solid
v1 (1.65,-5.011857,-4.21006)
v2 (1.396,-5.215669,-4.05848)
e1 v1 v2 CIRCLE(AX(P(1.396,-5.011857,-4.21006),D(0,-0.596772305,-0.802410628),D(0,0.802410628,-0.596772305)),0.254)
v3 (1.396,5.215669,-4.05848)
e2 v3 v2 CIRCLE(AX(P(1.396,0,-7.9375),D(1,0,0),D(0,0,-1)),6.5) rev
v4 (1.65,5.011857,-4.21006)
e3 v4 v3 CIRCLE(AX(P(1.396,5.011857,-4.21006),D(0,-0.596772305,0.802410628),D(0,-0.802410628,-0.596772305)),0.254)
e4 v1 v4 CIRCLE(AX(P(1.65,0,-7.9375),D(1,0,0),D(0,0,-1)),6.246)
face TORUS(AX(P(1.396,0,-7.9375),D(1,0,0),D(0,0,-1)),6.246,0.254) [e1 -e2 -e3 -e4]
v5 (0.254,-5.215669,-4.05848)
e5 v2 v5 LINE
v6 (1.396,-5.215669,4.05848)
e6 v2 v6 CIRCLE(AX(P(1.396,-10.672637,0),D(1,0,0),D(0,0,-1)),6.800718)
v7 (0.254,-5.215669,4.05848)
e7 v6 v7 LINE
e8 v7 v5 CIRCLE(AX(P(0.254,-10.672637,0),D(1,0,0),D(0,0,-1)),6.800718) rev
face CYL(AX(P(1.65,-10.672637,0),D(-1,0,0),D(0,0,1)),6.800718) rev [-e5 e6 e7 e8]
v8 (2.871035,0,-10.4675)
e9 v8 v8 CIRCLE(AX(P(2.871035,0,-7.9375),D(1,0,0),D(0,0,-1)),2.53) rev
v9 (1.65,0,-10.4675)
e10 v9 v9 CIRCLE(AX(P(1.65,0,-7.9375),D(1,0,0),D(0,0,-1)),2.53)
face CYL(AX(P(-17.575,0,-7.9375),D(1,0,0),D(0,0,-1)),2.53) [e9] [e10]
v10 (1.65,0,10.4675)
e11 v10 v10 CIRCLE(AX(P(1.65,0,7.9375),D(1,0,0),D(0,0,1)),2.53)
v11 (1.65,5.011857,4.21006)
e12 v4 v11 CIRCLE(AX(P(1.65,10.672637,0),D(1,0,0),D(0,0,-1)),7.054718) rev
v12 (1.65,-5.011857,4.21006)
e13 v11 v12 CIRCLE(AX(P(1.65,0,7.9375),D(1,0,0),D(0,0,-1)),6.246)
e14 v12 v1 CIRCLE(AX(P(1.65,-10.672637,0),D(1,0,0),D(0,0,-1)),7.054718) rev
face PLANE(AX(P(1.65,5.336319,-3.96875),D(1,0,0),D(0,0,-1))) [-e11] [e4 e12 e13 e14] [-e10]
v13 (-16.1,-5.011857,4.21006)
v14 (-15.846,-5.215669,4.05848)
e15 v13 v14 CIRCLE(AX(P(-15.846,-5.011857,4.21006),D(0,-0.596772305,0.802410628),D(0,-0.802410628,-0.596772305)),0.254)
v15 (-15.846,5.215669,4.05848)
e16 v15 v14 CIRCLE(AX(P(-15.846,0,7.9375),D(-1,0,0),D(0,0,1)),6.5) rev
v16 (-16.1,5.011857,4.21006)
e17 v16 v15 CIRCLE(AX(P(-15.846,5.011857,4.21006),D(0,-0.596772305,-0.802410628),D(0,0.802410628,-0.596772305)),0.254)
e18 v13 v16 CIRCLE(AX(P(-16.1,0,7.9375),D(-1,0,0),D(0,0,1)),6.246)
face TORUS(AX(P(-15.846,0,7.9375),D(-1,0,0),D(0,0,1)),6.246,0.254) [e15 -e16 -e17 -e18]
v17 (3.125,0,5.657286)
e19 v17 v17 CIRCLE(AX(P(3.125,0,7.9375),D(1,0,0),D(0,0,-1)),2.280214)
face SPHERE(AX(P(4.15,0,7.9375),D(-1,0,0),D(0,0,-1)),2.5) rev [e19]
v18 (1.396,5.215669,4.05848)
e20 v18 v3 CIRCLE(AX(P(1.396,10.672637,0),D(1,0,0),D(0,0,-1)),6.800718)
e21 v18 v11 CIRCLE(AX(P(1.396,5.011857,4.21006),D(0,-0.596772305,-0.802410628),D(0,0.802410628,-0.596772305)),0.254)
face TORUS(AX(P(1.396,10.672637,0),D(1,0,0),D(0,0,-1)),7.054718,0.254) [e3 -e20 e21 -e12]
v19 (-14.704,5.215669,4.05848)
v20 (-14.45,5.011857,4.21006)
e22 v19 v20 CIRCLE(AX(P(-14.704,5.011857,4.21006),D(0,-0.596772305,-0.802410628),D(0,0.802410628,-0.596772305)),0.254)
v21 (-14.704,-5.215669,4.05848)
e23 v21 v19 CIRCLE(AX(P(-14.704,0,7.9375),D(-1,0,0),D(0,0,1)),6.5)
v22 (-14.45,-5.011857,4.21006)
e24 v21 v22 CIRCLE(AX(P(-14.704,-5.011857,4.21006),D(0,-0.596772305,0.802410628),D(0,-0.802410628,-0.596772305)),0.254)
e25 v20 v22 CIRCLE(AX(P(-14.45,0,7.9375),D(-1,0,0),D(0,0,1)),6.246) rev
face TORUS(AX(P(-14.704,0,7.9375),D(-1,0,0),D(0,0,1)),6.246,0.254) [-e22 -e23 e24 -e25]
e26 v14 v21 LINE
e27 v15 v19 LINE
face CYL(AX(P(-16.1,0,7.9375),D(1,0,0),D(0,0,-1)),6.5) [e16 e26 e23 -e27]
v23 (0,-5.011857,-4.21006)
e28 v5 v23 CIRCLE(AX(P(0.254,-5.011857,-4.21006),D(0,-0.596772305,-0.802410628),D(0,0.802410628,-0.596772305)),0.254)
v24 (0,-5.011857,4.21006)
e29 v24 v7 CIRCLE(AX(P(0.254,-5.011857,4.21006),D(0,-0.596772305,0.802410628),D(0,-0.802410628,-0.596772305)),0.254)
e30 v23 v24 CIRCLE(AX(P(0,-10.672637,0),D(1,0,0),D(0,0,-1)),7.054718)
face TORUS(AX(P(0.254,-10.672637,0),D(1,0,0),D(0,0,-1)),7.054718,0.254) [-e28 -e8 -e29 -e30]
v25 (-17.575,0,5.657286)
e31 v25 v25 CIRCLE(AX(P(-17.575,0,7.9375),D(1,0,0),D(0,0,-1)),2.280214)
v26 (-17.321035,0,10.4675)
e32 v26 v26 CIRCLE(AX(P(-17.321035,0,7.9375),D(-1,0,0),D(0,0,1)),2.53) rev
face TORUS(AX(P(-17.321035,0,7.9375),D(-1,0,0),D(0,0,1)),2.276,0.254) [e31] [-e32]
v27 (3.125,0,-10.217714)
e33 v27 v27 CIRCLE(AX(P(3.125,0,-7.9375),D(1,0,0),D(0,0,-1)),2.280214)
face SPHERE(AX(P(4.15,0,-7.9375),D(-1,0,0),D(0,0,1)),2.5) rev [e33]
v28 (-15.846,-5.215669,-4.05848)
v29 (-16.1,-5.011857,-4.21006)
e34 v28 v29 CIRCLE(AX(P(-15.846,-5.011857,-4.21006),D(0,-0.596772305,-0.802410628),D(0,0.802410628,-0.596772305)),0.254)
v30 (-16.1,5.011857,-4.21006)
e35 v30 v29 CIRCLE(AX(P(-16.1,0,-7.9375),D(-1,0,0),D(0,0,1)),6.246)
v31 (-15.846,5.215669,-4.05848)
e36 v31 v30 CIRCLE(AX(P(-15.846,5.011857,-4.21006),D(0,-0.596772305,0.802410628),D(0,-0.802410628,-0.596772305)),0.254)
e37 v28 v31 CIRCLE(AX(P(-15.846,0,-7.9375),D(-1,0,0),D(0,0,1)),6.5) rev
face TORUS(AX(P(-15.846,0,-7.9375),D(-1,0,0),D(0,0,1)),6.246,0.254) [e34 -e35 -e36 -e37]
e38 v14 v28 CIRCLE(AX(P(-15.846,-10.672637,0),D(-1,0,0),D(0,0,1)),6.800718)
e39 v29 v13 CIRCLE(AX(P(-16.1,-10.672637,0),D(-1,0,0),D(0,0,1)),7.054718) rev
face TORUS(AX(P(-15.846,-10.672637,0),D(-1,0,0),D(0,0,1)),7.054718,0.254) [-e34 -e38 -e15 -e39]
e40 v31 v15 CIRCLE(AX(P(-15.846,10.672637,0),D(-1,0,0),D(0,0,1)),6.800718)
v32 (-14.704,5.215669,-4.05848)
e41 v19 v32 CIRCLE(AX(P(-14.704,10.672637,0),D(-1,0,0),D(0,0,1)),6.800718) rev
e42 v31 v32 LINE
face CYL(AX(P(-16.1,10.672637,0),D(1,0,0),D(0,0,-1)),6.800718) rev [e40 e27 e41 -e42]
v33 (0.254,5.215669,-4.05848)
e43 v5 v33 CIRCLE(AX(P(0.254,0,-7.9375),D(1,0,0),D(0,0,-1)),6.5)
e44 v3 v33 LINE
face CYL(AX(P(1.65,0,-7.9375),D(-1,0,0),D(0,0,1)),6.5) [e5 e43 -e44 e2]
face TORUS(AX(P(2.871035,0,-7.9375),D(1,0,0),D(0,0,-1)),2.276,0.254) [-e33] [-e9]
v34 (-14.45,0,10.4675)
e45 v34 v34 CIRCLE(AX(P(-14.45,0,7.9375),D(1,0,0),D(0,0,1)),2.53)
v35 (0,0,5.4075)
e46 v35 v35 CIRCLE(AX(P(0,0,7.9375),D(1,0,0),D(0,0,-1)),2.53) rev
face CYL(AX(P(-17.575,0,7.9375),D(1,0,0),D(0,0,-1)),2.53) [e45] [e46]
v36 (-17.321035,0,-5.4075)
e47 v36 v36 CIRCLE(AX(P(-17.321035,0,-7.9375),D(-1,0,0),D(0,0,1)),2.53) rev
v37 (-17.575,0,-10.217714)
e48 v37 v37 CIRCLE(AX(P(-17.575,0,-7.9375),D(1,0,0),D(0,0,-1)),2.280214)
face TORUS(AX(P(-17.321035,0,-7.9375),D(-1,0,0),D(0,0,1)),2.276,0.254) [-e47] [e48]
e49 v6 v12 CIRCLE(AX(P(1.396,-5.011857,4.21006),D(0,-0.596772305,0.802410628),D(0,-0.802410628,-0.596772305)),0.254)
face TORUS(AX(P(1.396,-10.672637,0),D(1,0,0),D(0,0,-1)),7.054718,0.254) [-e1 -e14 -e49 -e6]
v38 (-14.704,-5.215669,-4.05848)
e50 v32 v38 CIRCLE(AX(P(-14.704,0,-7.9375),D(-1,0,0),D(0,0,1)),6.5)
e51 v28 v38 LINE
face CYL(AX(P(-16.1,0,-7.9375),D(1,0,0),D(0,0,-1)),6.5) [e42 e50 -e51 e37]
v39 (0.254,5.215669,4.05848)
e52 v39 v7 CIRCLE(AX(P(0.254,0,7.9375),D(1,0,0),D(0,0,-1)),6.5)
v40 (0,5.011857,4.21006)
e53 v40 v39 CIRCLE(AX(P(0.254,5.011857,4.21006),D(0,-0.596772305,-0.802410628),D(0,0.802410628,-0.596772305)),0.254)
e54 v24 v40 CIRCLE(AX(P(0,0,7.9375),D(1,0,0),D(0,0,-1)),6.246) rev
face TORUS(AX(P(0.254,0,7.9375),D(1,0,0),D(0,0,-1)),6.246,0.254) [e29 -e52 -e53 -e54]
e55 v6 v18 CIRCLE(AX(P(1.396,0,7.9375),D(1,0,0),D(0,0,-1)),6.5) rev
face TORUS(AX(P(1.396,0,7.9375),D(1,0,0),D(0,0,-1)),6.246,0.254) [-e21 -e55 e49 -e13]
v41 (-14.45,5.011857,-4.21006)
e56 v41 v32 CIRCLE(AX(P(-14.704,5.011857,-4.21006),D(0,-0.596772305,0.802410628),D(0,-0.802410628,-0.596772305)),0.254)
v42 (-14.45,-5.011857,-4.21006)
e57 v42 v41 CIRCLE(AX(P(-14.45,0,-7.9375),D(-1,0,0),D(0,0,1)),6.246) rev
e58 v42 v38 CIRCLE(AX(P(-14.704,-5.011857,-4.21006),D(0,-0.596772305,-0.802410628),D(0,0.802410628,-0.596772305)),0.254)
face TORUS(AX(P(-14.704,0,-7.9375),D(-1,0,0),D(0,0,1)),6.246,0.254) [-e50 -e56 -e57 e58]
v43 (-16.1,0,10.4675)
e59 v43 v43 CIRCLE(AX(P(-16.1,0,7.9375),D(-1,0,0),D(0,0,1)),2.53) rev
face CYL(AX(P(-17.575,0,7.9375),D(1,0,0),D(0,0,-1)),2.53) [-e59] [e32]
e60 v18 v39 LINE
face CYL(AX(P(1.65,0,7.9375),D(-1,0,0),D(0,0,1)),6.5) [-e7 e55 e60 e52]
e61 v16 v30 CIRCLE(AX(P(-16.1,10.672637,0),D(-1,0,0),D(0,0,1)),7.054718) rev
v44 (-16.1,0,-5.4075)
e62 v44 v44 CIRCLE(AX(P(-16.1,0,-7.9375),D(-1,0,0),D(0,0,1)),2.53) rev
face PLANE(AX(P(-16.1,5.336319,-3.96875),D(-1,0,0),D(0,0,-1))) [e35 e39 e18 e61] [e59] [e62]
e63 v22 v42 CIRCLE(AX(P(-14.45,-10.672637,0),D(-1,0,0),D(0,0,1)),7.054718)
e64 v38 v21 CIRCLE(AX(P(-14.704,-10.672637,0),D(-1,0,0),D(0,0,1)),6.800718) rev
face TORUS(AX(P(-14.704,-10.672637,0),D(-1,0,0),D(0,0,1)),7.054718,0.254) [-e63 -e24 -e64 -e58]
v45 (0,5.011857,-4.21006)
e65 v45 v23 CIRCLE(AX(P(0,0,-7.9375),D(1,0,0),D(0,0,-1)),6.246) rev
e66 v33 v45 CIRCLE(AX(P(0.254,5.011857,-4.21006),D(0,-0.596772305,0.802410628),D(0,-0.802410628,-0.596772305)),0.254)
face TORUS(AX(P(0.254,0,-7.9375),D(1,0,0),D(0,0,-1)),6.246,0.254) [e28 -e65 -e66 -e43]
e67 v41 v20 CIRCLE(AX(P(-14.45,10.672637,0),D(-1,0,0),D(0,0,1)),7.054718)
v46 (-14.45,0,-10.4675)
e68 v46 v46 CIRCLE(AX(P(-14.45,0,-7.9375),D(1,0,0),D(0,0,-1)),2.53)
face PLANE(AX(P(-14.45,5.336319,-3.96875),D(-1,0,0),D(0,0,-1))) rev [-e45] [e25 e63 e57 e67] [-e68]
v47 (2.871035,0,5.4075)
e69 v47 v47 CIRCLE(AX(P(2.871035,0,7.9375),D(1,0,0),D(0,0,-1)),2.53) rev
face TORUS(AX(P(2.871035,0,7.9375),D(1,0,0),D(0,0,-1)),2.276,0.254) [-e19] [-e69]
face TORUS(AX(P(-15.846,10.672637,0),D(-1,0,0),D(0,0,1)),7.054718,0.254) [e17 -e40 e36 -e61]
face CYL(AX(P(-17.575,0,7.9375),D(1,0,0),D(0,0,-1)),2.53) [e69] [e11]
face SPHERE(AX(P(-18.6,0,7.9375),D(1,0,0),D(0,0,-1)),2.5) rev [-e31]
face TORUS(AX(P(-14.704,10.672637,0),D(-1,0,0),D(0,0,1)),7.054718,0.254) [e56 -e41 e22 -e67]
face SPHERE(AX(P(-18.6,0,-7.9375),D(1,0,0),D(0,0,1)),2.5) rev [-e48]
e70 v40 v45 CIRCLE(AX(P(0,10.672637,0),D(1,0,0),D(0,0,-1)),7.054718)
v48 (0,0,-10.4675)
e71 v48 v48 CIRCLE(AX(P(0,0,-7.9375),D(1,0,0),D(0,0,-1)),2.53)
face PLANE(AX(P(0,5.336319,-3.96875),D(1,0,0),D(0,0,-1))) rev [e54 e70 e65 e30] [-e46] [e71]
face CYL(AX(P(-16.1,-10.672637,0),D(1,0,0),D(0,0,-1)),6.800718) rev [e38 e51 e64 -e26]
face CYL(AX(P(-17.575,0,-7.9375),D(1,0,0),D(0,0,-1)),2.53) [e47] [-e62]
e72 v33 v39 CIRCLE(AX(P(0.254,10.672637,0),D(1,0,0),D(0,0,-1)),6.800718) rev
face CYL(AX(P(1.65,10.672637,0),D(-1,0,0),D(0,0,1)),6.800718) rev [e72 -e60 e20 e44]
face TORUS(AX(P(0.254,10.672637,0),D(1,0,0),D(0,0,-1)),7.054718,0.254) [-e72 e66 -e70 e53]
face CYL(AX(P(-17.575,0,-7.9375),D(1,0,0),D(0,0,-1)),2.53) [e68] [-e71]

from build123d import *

# Parameters (mm, degrees)
SKETCH2_R           = 2.53
BOSS_EXTRUDE1_DEPTH = 1.65
BOSS_EXTRUDE2_START = -19.225
SKETCH3_R           = 2.53
BOSS_EXTRUDE2_DEPTH = 20.7
FILLET1_R           = 0.254
FILLET2_R           = 0.254


with BuildPart() as part:
    # Sketch2 → Boss-Extrude1 (new body)
    with BuildSketch(Plane(origin=(0, 0, 0), x_dir=(0, 0, -1), z_dir=(1, 0, 0))):
        with BuildLine():
            ThreePointArc((4.05848002, -5.215669084), (14.4375, 0), (4.05848002, 5.215669084))
            ThreePointArc((4.05848002, 5.215669084), (0, 3.871919532), (-4.05848002, 5.215669084))
            ThreePointArc((-4.05848002, 5.215669084), (-14.4375, 0), (-4.05848002, -5.215669084))
            ThreePointArc((-4.05848002, -5.215669084), (0, -3.871919532), (4.05848002, -5.215669084))
        make_face()
        with Locations((7.9375, 0)):
            Circle(SKETCH2_R, mode=Mode.SUBTRACT)
        with Locations(Location((-7.9375, 0, 0), (0, 0, 180))):
            Circle(SKETCH2_R, mode=Mode.SUBTRACT)
    boss_extrude1 = extrude(amount=BOSS_EXTRUDE1_DEPTH)

    # Sketch3 → Boss-Extrude2 (add)
    with BuildSketch(Plane(origin=(1.65, 0, 0), x_dir=(0, 0, -1), z_dir=(1, 0, 0)).offset(BOSS_EXTRUDE2_START)):
        with Locations((7.9375, 0)):
            Circle(SKETCH3_R)
    boss_extrude2 = extrude(amount=BOSS_EXTRUDE2_DEPTH)

    # Mirror1: Boss-Extrude1 across plane
    add(boss_extrude1.mirror(Plane(origin=(-7.225, 0, 0), x_dir=(0, 0, 1), z_dir=(1, 0, 0))))

    # Sketch5 → Cut-Revolve1 (revolve, cut)
    with BuildSketch(Plane(origin=(0, 0, 0), x_dir=(1, 0, 0), z_dir=(0, 1, 0)), mode=Mode.PRIVATE) as cut_revolve1_sk:
        with BuildLine():
            Line((-16.1, 7.9375), (-17.6, 7.9375))
            Line((-17.6, 7.9375), (-17.6, 10.228787847))
            ThreePointArc((-17.6, 10.228787847), (-16.508349934, 9.306806394), (-16.1, 7.9375))
        make_face()
    cut_revolve1 = revolve(cut_revolve1_sk.sketch.rotate(Axis((-16.1, 0, -7.9375), (-1, 0, 0)), 180), axis=Axis((-16.1, 0, -7.9375), (-1, 0, 0)), mode=Mode.SUBTRACT)

    # Mirror2: Boss-Extrude2 across plane
    add(boss_extrude2.mirror(Plane.XY))

    # Mirror3: Cut-Revolve1 across plane
    add(cut_revolve1.mirror(Plane.XY), mode=Mode.SUBTRACT)

    # Mirror4: Cut-Revolve1 across plane
    add(cut_revolve1.mirror(Plane(origin=(-7.225, 0, 0), x_dir=(0, 0, 1), z_dir=(1, 0, 0))), mode=Mode.SUBTRACT)

    # Mirror4 copy 1 sketch → Mirror4 copy 1 (revolve, cut)
    with BuildSketch(Plane(origin=(-14.45, 0, 0), x_dir=(-1, 0, 0), z_dir=(0, 1, 0))):
        with BuildLine():
            Line((-16.1, 7.9375), (-17.6, 7.9375))
            Line((-17.6, 7.9375), (-17.6, 10.228787847))
            ThreePointArc((-17.6, 10.228787847), (-16.508349934, 9.306806394), (-16.1, 7.9375))
        make_face()
    revolve(axis=Axis((1.65, 0, 7.9375), (1, 0, 0)), mode=Mode.SUBTRACT)

    # Fillet1
    # the kernel refuses this fillet: 0.254 mm, written as the material it takes off along each edge
    with BuildSketch(Plane(origin=(-17.575, 0, -7.9375), x_dir=(0, 0, -1), z_dir=(0, -1, 0))) as fillet1_piece_1:
        with BuildLine():
            CenterArc((2.53 - FILLET1_R, FILLET1_R), FILLET1_R, 270, 90)
            Line((2.53 - FILLET1_R, 0), (2.53, 0))
            Line((2.53, 0), (2.53, FILLET1_R))
        make_face()
    revolve(axis=Axis((-17.575, 0, -7.9375), (1, 0, 0)), mode=Mode.SUBTRACT)
    with BuildSketch(Plane(origin=(3.125, 0, -7.9375), x_dir=(0, 0, -1), z_dir=(0, -1, 0))) as fillet1_piece_2:
        with BuildLine():
            CenterArc((2.53 - FILLET1_R, -FILLET1_R), FILLET1_R, 0, 90)
            Line((2.53 - FILLET1_R, 0), (2.53, 0))
            Line((2.53, 0), (2.53, -FILLET1_R))
        make_face()
    revolve(axis=Axis((3.125, 0, -7.9375), (1, 0, 0)), mode=Mode.SUBTRACT)
    with BuildSketch(Plane(origin=(3.125, 0, 7.9375), x_dir=(0, 0, 1), z_dir=(0, -1, 0))) as fillet1_piece_3:
        with BuildLine():
            CenterArc((2.53 - FILLET1_R, FILLET1_R), FILLET1_R, 270, 90)
            Line((2.53 - FILLET1_R, 0), (2.53, 0))
            Line((2.53, 0), (2.53, FILLET1_R))
        make_face()
    revolve(axis=Axis((3.125, 0, 7.9375), (-1, 0, 0)), mode=Mode.SUBTRACT)
    with BuildSketch(Plane(origin=(-17.575, 0, 7.9375), x_dir=(0, 0, 1), z_dir=(0, -1, 0))) as fillet1_piece_4:
        with BuildLine():
            CenterArc((2.53 - FILLET1_R, -FILLET1_R), FILLET1_R, 0, 90)
            Line((2.53 - FILLET1_R, 0), (2.53, 0))
            Line((2.53, 0), (2.53, -FILLET1_R))
        make_face()
    revolve(axis=Axis((-17.575, 0, 7.9375), (-1, 0, 0)), mode=Mode.SUBTRACT)

    # Fillet2
    fillet2_edges = [part.edges().sort_by_distance(p)[0] for p in [
        (1.65, -3.871919532, 0),
        (1.65, 0, -14.4375),
        (-16.1, 3.871919532, 0),
        (-16.1, 0, -14.4375),
        (-16.1, -3.871919532, 0),
        (-16.1, 0, 14.4375),
        (-14.45, 3.871919532, 0),
        (-14.45, 0, 14.4375),
        (-14.45, -3.871919532, 0),
        (-14.45, 0, -14.4375),
        (1.65, 3.871919532, 0),
        (0, 0, -14.4375),
        (0, -3.871919532, 0),
        (0, 0, 14.4375),
        (0, 3.871919532, 0),
        (1.65, 0, 14.4375),
    ]]
    fillet(fillet2_edges, radius=FILLET2_R)


solid = part.part
